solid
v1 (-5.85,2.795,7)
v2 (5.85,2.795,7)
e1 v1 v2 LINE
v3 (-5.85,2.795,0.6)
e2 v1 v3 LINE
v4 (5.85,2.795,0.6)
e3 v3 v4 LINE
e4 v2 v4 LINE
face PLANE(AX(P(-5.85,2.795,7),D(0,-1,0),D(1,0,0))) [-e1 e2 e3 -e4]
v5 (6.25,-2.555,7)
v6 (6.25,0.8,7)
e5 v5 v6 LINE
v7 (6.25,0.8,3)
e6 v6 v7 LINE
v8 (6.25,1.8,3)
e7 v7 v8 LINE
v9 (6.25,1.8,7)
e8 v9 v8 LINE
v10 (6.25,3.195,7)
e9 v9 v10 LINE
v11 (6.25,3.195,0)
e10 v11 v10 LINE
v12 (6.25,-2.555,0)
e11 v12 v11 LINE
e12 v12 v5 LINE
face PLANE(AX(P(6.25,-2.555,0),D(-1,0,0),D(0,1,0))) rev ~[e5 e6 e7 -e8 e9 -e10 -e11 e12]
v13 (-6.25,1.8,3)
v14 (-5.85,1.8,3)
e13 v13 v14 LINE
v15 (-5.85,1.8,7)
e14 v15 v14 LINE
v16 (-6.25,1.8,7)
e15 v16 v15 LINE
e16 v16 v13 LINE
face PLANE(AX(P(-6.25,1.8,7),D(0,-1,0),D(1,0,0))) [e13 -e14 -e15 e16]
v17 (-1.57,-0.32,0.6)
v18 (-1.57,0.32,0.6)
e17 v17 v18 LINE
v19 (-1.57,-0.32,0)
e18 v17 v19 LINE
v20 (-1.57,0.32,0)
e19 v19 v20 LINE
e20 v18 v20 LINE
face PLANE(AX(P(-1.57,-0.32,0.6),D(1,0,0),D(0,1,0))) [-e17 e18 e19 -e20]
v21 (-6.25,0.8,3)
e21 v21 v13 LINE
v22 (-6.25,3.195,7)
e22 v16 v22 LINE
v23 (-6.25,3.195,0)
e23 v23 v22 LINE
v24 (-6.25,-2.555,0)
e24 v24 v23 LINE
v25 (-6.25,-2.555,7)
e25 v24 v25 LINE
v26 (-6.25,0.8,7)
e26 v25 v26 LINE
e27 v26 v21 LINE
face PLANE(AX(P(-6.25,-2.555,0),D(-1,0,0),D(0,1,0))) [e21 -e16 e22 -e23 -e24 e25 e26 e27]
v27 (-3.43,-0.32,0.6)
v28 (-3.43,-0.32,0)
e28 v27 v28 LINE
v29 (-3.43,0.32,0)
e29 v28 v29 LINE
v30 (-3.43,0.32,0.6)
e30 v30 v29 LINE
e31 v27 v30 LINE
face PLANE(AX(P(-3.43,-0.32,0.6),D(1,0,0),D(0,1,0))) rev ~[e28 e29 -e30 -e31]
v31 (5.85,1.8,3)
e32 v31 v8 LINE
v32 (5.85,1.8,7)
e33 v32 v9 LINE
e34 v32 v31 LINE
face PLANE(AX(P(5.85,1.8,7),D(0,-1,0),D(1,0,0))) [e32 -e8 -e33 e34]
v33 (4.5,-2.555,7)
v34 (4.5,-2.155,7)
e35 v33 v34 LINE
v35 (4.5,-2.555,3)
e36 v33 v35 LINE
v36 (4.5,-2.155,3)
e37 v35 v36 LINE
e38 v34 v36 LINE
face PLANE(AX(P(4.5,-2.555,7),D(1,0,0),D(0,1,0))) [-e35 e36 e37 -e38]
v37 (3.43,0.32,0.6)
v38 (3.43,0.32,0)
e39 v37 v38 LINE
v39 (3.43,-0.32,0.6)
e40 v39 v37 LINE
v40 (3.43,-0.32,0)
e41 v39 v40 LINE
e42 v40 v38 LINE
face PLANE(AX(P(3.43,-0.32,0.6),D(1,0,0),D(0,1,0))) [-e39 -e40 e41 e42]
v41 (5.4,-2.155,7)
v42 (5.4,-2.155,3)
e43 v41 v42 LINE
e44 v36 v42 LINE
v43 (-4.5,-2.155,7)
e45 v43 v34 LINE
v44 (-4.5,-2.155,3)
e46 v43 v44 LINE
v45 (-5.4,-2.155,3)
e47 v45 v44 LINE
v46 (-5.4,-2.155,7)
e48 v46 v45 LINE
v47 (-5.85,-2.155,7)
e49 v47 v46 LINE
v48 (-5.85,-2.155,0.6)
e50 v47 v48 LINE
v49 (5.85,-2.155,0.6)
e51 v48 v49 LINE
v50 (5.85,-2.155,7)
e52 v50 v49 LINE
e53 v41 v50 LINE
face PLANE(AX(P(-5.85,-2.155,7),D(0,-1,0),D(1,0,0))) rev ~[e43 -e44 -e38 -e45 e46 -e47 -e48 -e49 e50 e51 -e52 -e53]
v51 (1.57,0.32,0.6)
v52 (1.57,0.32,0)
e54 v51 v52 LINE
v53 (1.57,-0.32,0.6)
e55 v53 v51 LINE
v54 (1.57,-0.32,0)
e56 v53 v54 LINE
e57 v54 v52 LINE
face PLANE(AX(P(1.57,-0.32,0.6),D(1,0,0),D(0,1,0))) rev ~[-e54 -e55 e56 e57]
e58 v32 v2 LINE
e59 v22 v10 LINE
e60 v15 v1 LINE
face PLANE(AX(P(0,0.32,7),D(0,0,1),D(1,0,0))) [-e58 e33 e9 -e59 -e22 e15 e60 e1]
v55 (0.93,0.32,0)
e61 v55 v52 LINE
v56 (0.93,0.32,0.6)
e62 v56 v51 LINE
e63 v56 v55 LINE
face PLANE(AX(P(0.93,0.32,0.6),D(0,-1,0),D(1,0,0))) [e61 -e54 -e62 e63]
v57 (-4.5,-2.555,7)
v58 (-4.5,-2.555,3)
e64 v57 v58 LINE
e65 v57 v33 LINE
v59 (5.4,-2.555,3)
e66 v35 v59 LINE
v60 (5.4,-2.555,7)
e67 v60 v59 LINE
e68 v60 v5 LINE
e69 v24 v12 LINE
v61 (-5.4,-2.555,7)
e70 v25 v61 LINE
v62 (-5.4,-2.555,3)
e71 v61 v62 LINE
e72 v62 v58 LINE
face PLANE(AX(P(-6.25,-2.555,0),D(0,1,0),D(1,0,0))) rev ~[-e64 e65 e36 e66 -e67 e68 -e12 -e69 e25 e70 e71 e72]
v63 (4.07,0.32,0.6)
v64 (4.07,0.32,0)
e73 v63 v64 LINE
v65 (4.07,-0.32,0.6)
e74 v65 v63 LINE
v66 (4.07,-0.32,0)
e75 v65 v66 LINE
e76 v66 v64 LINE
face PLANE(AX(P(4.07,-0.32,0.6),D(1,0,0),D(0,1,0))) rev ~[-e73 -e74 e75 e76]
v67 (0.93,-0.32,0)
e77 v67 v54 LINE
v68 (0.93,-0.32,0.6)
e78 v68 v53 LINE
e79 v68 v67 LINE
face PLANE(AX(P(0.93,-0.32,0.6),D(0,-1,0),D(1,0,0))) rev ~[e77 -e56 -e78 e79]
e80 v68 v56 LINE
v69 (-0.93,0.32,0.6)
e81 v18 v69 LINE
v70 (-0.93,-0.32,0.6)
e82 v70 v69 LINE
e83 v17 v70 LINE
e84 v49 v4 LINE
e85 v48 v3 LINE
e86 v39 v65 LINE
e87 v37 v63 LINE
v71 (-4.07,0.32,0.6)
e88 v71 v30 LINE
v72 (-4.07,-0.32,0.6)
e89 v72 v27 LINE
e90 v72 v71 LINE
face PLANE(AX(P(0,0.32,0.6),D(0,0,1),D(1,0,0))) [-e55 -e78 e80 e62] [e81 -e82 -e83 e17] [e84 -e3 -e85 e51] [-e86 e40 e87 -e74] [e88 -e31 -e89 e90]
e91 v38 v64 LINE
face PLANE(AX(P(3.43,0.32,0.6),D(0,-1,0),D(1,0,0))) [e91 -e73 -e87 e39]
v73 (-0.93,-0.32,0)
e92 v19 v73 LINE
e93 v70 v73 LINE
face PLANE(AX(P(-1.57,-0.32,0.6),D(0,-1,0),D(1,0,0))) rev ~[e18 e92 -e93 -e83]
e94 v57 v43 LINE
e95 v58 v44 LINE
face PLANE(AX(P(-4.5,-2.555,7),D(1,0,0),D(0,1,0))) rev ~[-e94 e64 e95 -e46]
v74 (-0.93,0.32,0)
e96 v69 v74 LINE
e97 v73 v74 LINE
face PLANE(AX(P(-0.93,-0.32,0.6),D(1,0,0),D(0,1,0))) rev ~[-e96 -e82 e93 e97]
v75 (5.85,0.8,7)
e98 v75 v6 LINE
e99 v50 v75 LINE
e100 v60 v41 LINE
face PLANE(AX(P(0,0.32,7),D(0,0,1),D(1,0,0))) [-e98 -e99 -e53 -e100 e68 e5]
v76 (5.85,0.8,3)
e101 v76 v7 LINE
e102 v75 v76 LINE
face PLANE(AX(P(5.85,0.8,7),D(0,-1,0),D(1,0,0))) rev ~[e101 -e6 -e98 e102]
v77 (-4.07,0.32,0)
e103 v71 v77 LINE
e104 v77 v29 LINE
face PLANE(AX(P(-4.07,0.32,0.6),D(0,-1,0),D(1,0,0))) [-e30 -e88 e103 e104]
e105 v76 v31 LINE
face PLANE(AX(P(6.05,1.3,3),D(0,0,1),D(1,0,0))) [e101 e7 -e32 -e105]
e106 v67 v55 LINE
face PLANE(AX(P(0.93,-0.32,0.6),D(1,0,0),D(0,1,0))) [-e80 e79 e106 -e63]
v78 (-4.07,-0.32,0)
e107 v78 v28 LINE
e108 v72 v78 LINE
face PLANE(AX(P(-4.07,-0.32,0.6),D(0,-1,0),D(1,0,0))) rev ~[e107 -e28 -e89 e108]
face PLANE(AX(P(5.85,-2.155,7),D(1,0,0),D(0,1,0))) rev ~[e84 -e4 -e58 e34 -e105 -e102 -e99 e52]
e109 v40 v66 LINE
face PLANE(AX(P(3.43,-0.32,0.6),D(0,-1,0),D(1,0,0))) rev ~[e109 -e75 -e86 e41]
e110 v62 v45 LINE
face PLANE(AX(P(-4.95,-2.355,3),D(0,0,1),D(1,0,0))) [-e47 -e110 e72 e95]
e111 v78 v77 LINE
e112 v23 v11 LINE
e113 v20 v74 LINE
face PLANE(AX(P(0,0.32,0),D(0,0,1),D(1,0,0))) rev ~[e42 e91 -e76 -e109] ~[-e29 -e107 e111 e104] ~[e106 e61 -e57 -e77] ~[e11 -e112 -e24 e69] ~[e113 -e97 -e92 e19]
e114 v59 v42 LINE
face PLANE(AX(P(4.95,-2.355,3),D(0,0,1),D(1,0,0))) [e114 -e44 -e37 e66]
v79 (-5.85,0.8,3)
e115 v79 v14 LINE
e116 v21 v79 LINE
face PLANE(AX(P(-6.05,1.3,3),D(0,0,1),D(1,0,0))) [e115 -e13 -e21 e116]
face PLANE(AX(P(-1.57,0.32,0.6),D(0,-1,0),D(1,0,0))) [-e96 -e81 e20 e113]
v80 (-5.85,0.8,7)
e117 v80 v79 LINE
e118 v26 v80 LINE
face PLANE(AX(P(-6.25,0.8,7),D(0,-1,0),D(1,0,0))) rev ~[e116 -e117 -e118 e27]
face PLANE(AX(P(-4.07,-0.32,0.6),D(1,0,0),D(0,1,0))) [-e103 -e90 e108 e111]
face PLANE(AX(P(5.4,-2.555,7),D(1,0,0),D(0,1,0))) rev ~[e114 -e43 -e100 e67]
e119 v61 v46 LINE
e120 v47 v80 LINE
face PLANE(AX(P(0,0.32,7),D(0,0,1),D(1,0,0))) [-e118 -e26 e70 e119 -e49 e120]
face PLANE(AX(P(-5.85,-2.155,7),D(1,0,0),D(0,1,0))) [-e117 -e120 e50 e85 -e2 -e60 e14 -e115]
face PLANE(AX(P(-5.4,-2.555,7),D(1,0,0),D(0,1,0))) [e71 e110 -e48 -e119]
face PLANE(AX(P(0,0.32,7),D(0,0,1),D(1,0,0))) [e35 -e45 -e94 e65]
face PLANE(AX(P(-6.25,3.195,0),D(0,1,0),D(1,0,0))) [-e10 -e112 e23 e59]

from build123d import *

# Parameters (mm, degrees)
F1_W      = 12.5
F1_H      = 5.75
F2_DEPTH  = 7
F3_W      = 11.7
F3_H      = 4.95
F4_DEPTH  = 6.4
F5_W      = 0.64
F5_H      = 0.64
F6_DEPTH  = 0.601
F7_W      = 0.9
F7_H      = 0.4
F8_DEPTH  = 4
F9_W      = 0.4
F9_H      = 1
F10_DEPTH = 4


# Not quite as in the source:
# - a feature names something its author has since deleted; it is built from what else it names


with BuildPart() as f2:
    # F1 (on Top) → F2 (new body)
    with BuildSketch(Plane.XY):
        with Locations((0, 0.32)):
            Rectangle(F1_W, F1_H)
    extrude(amount=F2_DEPTH)

    # F3 (on face) → F4 (cut)
    with BuildSketch(Plane.XY.offset(7)):
        with Locations((0, 0.32)):
            Rectangle(F3_W, F3_H)
    extrude(amount=-F4_DEPTH, mode=Mode.SUBTRACT)

    # F5 (on face) → F6 (cut, through all)
    with BuildSketch(Plane.XY.offset(0.6)):
        with Locations((-1.25, 0)):
            Rectangle(F5_W, F5_H)
        with Locations((-3.75, 0)):
            Rectangle(F5_W, F5_H)
        with Locations((1.25, 0)):
            Rectangle(F5_W, F5_H)
        with Locations((3.75, 0)):
            Rectangle(F5_W, F5_H)
    extrude(amount=-F6_DEPTH, mode=Mode.SUBTRACT)

    # F7 (on face) → F8 (cut)
    with BuildSketch(Plane.XY.offset(7)):
        with Locations((-4.95, -2.355)):
            Rectangle(F7_W, F7_H)
        with Locations((4.95, -2.355)):
            Rectangle(F7_W, F7_H)
    extrude(amount=-F8_DEPTH, mode=Mode.SUBTRACT)

    # F9 (on face) → F10 (cut)
    with BuildSketch(Plane.XY.offset(7)):
        with Locations((-6.05, 1.3)):
            Rectangle(F9_W, F9_H)
        with Locations((6.05, 1.3)):
            Rectangle(F9_W, F9_H)
    extrude(amount=-F10_DEPTH, mode=Mode.SUBTRACT)


solid = f2.part
